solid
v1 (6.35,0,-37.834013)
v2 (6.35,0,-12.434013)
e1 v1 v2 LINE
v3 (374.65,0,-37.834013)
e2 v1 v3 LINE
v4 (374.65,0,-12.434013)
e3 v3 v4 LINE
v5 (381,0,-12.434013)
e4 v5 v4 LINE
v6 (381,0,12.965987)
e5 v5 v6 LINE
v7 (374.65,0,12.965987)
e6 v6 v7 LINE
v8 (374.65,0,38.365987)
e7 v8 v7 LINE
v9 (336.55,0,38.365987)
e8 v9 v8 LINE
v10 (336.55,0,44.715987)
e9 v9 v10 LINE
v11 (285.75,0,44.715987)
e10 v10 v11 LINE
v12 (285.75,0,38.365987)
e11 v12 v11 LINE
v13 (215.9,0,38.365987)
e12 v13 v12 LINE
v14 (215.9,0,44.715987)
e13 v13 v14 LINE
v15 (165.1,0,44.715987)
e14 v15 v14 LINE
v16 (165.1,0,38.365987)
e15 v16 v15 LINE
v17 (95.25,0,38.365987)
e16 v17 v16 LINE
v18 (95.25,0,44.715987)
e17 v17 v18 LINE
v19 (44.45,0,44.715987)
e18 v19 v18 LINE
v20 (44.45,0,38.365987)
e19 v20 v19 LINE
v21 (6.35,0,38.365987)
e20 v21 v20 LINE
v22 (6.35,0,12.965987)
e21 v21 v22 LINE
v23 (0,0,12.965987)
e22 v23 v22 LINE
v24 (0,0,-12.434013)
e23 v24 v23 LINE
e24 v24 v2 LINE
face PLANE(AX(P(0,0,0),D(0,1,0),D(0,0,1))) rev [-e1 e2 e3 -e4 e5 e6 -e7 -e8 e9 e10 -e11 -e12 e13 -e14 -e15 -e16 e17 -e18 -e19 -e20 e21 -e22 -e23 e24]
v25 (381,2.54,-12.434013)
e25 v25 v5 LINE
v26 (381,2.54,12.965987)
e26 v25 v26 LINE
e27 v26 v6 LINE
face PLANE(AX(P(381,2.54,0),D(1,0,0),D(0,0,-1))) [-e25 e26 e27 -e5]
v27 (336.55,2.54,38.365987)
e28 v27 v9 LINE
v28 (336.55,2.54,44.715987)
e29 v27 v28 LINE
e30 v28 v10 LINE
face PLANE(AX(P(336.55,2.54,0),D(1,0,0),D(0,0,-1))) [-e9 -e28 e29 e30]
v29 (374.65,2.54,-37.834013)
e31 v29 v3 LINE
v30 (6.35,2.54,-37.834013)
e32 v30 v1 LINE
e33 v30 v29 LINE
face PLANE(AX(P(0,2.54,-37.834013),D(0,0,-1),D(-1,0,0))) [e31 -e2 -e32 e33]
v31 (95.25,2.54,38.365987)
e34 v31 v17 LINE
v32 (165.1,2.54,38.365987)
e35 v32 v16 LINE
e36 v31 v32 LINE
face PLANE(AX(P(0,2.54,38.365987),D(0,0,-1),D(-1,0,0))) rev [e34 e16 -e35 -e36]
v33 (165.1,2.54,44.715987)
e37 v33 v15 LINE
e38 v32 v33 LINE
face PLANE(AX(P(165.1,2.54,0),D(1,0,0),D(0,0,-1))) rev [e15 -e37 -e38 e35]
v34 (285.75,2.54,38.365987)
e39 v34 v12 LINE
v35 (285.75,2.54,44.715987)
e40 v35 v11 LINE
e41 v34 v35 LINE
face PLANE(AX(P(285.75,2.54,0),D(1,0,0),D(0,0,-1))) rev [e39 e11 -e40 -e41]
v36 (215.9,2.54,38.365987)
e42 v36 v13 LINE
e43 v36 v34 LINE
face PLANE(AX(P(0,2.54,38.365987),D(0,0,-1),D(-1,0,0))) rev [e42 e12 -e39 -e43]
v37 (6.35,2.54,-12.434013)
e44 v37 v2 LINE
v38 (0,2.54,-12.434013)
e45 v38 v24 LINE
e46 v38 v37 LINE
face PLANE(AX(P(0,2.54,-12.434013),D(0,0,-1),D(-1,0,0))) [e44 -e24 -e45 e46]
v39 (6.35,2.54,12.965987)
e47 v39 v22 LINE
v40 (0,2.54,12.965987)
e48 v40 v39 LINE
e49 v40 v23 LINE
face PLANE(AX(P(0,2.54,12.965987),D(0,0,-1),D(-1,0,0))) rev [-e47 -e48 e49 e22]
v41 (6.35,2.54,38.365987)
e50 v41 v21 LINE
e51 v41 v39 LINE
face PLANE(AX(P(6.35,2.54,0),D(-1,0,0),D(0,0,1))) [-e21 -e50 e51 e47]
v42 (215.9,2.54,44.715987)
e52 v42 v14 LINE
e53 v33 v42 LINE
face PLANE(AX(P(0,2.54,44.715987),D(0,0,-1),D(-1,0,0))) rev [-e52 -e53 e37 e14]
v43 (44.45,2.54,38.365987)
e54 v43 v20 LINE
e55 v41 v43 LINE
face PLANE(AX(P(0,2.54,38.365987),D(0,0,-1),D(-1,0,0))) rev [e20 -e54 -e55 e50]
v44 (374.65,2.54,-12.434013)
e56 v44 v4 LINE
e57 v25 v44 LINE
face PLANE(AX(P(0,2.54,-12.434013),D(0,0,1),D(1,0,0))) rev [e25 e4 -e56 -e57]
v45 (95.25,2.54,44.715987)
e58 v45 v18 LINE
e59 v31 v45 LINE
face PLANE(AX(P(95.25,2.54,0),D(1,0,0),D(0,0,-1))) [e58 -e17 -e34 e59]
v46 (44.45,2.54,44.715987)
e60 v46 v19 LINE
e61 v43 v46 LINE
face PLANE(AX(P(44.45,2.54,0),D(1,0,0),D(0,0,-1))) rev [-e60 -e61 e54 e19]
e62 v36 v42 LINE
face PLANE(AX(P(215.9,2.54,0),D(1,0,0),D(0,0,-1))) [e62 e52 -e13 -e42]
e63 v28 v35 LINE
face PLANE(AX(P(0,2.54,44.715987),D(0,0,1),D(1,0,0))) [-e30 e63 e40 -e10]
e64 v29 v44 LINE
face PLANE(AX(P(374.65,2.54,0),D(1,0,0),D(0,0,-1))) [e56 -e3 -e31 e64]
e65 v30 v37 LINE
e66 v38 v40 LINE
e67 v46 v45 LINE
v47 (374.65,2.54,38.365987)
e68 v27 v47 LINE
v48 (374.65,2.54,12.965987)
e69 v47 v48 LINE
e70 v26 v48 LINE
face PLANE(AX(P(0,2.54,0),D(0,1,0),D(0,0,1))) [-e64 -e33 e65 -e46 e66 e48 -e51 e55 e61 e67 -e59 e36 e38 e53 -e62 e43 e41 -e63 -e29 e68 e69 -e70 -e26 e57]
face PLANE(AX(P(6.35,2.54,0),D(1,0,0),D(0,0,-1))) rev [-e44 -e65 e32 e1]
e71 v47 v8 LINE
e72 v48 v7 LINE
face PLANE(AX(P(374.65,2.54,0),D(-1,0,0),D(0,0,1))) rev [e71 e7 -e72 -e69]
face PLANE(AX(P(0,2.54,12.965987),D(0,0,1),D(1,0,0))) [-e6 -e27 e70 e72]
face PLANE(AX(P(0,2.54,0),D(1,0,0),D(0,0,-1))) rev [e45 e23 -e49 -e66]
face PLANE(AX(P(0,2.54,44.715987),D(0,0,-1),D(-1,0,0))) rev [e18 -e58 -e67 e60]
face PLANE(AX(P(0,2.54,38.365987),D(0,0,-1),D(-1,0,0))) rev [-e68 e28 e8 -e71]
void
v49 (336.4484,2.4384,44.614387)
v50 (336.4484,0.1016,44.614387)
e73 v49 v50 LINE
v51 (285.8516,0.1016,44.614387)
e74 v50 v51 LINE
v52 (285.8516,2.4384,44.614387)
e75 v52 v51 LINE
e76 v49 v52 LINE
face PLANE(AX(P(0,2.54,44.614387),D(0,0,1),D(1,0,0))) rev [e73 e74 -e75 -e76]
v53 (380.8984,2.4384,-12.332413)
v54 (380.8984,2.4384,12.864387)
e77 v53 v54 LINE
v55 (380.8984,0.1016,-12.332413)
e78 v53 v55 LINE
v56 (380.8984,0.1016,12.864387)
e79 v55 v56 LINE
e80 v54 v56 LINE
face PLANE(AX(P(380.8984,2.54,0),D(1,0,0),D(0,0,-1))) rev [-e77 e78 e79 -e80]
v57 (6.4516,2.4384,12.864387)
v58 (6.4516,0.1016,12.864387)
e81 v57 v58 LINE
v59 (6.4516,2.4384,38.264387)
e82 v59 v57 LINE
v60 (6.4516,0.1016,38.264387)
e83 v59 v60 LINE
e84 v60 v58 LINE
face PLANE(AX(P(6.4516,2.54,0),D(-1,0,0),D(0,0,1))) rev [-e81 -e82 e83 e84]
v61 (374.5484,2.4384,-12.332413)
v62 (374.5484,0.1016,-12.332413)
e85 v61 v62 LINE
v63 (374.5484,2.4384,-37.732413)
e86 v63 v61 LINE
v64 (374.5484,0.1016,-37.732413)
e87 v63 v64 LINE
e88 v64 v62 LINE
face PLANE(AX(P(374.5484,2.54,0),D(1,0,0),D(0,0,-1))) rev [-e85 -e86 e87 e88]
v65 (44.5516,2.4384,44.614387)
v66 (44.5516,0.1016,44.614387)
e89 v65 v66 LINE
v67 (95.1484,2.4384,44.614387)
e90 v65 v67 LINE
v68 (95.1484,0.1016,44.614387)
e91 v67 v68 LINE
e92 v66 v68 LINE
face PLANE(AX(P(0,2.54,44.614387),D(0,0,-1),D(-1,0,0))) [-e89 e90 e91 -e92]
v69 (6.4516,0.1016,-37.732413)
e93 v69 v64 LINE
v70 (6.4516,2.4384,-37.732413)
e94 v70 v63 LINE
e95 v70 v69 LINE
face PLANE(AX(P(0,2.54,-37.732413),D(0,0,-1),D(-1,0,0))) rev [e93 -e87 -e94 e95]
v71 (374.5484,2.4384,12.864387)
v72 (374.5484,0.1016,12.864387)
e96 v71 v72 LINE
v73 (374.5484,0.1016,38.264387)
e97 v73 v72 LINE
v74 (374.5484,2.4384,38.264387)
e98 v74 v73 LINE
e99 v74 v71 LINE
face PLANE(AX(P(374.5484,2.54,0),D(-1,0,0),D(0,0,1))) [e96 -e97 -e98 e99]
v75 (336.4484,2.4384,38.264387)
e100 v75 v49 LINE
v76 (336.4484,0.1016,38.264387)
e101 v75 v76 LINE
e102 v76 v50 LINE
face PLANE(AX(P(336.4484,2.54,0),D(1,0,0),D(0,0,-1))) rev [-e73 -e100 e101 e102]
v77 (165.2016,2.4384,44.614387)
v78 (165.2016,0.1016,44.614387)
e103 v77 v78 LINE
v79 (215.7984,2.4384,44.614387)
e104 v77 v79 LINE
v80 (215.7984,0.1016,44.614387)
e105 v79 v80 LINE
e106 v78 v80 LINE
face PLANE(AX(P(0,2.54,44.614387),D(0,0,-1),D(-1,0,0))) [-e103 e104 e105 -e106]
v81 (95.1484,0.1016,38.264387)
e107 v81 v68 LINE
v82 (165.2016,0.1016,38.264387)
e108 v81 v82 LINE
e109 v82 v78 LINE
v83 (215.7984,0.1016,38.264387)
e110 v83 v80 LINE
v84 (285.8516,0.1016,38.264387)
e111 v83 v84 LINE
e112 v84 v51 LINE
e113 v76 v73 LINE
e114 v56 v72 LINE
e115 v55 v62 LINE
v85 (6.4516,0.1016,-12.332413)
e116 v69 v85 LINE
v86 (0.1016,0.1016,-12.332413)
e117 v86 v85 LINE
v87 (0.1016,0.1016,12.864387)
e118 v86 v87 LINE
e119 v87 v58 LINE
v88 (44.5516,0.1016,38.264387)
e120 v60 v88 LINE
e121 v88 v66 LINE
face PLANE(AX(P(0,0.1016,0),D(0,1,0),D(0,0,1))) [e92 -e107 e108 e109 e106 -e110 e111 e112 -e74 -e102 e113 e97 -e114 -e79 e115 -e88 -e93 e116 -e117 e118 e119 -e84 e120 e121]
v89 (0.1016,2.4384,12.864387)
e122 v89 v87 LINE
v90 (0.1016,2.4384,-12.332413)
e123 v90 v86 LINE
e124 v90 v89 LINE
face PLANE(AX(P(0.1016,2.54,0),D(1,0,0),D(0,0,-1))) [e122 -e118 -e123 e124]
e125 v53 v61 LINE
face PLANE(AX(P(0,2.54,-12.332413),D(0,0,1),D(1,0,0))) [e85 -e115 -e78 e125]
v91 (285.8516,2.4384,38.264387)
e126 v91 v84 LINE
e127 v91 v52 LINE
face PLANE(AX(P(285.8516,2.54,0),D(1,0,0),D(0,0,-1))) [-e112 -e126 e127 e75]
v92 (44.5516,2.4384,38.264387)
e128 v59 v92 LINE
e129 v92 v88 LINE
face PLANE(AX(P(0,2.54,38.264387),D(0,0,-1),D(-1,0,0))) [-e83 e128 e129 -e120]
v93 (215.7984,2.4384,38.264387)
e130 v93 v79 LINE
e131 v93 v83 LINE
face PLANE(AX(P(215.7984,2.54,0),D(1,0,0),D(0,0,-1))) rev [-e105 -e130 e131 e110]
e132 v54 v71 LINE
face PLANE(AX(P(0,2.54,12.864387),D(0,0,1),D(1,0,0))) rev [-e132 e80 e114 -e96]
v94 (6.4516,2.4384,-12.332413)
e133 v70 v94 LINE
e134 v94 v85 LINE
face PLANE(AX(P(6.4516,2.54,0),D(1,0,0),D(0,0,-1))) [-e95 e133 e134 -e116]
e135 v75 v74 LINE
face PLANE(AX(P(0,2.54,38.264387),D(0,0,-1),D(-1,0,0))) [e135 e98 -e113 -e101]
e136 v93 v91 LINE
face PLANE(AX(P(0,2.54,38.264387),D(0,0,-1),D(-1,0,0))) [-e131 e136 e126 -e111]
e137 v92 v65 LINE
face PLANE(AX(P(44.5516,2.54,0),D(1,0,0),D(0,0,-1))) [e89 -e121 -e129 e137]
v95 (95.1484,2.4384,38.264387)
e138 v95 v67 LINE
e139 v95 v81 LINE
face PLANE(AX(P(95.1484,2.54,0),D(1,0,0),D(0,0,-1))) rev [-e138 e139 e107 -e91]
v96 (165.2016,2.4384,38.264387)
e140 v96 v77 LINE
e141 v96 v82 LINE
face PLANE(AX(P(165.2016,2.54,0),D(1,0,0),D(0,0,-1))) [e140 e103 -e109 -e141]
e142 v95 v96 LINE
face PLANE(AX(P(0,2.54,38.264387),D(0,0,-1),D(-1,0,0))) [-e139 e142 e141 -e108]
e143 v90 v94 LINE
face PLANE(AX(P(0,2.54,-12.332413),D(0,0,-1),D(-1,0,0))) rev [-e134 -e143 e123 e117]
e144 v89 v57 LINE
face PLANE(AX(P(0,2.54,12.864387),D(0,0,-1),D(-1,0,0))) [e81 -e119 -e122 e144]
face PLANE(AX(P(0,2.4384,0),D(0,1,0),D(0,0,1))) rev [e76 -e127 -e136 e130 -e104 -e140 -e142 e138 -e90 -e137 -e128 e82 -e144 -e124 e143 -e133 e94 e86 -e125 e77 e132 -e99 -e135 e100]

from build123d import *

# Parameters (mm, degrees)
BOSS_EXTRUDE1_DEPTH = 2.54
SHELL1_START        = 6.4516
SHELL1_OUTLINE_W    = 2.3368
SHELL1_OUTLINE_H    = 75.9968
SHELL1_DEPTH        = 368.0968
SHELL1_START_2      = 44.5516
SHELL1_2_OUTLINE_W  = 2.3368
SHELL1_2_OUTLINE_H  = 6.35
SHELL1_2_DEPTH      = 50.5968
SHELL1_START_3      = 165.2016
SHELL1_3_OUTLINE_W  = 2.3368
SHELL1_3_OUTLINE_H  = 6.35
SHELL1_3_DEPTH      = 50.5968
SHELL1_START_4      = 285.8516
SHELL1_4_OUTLINE_W  = 2.3368
SHELL1_4_OUTLINE_H  = 6.35
SHELL1_4_DEPTH      = 50.5968
SHELL1_START_5      = 0.1016
SHELL1_5_OUTLINE_W  = 2.3368
SHELL1_5_OUTLINE_H  = 25.1968
SHELL1_5_DEPTH      = 380.7968


# Read off the part's stored shape, not the designer's step: Shell1
with BuildPart() as part:
    # Sketch1 → Boss-Extrude1 (new body)
    with BuildSketch(Plane(origin=(0, 0, 0), x_dir=(1, 0, 0), z_dir=(0, 1, 0))):
        Polygon((0, 12.434013317), (0, -12.965986683), (6.35, -12.965986683), (6.35, -38.365986683), (44.45, -38.365986683), (44.45, -44.715986683), (95.25, -44.715986683), (95.25, -38.365986683), (165.1, -38.365986683), (165.1, -44.715986683), (215.9, -44.715986683), (215.9, -38.365986683), (285.75, -38.365986683), (285.75, -44.715986683), (336.55, -44.715986683), (336.55, -38.365986683), (374.65, -38.365986683), (374.65, -12.965986683), (381, -12.965986683), (381, 12.434013317), (374.65, 12.434013317), (374.65, 37.834013317), (6.35, 37.834013317), (6.35, 12.434013317), align=None)
    extrude(amount=BOSS_EXTRUDE1_DEPTH)

    # Shell1 outline → Shell1 (cut)
    with BuildSketch(Plane.YZ.offset(SHELL1_START)):
        with Locations((1.27, 0.265986683)):
            Rectangle(SHELL1_OUTLINE_W, SHELL1_OUTLINE_H)
    extrude(amount=SHELL1_DEPTH, mode=Mode.SUBTRACT)

    # Shell1 2 outline → Shell1 2 (cut)
    with BuildSketch(Plane.YZ.offset(SHELL1_START_2)):
        with Locations((1.27, 41.439386683)):
            Rectangle(SHELL1_2_OUTLINE_W, SHELL1_2_OUTLINE_H)
    extrude(amount=SHELL1_2_DEPTH, mode=Mode.SUBTRACT)

    # Shell1 3 outline → Shell1 3 (cut)
    with BuildSketch(Plane.YZ.offset(SHELL1_START_3)):
        with Locations((1.27, 41.439386683)):
            Rectangle(SHELL1_3_OUTLINE_W, SHELL1_3_OUTLINE_H)
    extrude(amount=SHELL1_3_DEPTH, mode=Mode.SUBTRACT)

    # Shell1 4 outline → Shell1 4 (cut)
    with BuildSketch(Plane.YZ.offset(SHELL1_START_4)):
        with Locations((1.27, 41.439386683)):
            Rectangle(SHELL1_4_OUTLINE_W, SHELL1_4_OUTLINE_H)
    extrude(amount=SHELL1_4_DEPTH, mode=Mode.SUBTRACT)

    # Shell1 5 outline → Shell1 5 (cut)
    with BuildSketch(Plane.YZ.offset(SHELL1_START_5)):
        with Locations((1.27, 0.265986683)):
            Rectangle(SHELL1_5_OUTLINE_W, SHELL1_5_OUTLINE_H)
    extrude(amount=SHELL1_5_DEPTH, mode=Mode.SUBTRACT)


solid = part.part
